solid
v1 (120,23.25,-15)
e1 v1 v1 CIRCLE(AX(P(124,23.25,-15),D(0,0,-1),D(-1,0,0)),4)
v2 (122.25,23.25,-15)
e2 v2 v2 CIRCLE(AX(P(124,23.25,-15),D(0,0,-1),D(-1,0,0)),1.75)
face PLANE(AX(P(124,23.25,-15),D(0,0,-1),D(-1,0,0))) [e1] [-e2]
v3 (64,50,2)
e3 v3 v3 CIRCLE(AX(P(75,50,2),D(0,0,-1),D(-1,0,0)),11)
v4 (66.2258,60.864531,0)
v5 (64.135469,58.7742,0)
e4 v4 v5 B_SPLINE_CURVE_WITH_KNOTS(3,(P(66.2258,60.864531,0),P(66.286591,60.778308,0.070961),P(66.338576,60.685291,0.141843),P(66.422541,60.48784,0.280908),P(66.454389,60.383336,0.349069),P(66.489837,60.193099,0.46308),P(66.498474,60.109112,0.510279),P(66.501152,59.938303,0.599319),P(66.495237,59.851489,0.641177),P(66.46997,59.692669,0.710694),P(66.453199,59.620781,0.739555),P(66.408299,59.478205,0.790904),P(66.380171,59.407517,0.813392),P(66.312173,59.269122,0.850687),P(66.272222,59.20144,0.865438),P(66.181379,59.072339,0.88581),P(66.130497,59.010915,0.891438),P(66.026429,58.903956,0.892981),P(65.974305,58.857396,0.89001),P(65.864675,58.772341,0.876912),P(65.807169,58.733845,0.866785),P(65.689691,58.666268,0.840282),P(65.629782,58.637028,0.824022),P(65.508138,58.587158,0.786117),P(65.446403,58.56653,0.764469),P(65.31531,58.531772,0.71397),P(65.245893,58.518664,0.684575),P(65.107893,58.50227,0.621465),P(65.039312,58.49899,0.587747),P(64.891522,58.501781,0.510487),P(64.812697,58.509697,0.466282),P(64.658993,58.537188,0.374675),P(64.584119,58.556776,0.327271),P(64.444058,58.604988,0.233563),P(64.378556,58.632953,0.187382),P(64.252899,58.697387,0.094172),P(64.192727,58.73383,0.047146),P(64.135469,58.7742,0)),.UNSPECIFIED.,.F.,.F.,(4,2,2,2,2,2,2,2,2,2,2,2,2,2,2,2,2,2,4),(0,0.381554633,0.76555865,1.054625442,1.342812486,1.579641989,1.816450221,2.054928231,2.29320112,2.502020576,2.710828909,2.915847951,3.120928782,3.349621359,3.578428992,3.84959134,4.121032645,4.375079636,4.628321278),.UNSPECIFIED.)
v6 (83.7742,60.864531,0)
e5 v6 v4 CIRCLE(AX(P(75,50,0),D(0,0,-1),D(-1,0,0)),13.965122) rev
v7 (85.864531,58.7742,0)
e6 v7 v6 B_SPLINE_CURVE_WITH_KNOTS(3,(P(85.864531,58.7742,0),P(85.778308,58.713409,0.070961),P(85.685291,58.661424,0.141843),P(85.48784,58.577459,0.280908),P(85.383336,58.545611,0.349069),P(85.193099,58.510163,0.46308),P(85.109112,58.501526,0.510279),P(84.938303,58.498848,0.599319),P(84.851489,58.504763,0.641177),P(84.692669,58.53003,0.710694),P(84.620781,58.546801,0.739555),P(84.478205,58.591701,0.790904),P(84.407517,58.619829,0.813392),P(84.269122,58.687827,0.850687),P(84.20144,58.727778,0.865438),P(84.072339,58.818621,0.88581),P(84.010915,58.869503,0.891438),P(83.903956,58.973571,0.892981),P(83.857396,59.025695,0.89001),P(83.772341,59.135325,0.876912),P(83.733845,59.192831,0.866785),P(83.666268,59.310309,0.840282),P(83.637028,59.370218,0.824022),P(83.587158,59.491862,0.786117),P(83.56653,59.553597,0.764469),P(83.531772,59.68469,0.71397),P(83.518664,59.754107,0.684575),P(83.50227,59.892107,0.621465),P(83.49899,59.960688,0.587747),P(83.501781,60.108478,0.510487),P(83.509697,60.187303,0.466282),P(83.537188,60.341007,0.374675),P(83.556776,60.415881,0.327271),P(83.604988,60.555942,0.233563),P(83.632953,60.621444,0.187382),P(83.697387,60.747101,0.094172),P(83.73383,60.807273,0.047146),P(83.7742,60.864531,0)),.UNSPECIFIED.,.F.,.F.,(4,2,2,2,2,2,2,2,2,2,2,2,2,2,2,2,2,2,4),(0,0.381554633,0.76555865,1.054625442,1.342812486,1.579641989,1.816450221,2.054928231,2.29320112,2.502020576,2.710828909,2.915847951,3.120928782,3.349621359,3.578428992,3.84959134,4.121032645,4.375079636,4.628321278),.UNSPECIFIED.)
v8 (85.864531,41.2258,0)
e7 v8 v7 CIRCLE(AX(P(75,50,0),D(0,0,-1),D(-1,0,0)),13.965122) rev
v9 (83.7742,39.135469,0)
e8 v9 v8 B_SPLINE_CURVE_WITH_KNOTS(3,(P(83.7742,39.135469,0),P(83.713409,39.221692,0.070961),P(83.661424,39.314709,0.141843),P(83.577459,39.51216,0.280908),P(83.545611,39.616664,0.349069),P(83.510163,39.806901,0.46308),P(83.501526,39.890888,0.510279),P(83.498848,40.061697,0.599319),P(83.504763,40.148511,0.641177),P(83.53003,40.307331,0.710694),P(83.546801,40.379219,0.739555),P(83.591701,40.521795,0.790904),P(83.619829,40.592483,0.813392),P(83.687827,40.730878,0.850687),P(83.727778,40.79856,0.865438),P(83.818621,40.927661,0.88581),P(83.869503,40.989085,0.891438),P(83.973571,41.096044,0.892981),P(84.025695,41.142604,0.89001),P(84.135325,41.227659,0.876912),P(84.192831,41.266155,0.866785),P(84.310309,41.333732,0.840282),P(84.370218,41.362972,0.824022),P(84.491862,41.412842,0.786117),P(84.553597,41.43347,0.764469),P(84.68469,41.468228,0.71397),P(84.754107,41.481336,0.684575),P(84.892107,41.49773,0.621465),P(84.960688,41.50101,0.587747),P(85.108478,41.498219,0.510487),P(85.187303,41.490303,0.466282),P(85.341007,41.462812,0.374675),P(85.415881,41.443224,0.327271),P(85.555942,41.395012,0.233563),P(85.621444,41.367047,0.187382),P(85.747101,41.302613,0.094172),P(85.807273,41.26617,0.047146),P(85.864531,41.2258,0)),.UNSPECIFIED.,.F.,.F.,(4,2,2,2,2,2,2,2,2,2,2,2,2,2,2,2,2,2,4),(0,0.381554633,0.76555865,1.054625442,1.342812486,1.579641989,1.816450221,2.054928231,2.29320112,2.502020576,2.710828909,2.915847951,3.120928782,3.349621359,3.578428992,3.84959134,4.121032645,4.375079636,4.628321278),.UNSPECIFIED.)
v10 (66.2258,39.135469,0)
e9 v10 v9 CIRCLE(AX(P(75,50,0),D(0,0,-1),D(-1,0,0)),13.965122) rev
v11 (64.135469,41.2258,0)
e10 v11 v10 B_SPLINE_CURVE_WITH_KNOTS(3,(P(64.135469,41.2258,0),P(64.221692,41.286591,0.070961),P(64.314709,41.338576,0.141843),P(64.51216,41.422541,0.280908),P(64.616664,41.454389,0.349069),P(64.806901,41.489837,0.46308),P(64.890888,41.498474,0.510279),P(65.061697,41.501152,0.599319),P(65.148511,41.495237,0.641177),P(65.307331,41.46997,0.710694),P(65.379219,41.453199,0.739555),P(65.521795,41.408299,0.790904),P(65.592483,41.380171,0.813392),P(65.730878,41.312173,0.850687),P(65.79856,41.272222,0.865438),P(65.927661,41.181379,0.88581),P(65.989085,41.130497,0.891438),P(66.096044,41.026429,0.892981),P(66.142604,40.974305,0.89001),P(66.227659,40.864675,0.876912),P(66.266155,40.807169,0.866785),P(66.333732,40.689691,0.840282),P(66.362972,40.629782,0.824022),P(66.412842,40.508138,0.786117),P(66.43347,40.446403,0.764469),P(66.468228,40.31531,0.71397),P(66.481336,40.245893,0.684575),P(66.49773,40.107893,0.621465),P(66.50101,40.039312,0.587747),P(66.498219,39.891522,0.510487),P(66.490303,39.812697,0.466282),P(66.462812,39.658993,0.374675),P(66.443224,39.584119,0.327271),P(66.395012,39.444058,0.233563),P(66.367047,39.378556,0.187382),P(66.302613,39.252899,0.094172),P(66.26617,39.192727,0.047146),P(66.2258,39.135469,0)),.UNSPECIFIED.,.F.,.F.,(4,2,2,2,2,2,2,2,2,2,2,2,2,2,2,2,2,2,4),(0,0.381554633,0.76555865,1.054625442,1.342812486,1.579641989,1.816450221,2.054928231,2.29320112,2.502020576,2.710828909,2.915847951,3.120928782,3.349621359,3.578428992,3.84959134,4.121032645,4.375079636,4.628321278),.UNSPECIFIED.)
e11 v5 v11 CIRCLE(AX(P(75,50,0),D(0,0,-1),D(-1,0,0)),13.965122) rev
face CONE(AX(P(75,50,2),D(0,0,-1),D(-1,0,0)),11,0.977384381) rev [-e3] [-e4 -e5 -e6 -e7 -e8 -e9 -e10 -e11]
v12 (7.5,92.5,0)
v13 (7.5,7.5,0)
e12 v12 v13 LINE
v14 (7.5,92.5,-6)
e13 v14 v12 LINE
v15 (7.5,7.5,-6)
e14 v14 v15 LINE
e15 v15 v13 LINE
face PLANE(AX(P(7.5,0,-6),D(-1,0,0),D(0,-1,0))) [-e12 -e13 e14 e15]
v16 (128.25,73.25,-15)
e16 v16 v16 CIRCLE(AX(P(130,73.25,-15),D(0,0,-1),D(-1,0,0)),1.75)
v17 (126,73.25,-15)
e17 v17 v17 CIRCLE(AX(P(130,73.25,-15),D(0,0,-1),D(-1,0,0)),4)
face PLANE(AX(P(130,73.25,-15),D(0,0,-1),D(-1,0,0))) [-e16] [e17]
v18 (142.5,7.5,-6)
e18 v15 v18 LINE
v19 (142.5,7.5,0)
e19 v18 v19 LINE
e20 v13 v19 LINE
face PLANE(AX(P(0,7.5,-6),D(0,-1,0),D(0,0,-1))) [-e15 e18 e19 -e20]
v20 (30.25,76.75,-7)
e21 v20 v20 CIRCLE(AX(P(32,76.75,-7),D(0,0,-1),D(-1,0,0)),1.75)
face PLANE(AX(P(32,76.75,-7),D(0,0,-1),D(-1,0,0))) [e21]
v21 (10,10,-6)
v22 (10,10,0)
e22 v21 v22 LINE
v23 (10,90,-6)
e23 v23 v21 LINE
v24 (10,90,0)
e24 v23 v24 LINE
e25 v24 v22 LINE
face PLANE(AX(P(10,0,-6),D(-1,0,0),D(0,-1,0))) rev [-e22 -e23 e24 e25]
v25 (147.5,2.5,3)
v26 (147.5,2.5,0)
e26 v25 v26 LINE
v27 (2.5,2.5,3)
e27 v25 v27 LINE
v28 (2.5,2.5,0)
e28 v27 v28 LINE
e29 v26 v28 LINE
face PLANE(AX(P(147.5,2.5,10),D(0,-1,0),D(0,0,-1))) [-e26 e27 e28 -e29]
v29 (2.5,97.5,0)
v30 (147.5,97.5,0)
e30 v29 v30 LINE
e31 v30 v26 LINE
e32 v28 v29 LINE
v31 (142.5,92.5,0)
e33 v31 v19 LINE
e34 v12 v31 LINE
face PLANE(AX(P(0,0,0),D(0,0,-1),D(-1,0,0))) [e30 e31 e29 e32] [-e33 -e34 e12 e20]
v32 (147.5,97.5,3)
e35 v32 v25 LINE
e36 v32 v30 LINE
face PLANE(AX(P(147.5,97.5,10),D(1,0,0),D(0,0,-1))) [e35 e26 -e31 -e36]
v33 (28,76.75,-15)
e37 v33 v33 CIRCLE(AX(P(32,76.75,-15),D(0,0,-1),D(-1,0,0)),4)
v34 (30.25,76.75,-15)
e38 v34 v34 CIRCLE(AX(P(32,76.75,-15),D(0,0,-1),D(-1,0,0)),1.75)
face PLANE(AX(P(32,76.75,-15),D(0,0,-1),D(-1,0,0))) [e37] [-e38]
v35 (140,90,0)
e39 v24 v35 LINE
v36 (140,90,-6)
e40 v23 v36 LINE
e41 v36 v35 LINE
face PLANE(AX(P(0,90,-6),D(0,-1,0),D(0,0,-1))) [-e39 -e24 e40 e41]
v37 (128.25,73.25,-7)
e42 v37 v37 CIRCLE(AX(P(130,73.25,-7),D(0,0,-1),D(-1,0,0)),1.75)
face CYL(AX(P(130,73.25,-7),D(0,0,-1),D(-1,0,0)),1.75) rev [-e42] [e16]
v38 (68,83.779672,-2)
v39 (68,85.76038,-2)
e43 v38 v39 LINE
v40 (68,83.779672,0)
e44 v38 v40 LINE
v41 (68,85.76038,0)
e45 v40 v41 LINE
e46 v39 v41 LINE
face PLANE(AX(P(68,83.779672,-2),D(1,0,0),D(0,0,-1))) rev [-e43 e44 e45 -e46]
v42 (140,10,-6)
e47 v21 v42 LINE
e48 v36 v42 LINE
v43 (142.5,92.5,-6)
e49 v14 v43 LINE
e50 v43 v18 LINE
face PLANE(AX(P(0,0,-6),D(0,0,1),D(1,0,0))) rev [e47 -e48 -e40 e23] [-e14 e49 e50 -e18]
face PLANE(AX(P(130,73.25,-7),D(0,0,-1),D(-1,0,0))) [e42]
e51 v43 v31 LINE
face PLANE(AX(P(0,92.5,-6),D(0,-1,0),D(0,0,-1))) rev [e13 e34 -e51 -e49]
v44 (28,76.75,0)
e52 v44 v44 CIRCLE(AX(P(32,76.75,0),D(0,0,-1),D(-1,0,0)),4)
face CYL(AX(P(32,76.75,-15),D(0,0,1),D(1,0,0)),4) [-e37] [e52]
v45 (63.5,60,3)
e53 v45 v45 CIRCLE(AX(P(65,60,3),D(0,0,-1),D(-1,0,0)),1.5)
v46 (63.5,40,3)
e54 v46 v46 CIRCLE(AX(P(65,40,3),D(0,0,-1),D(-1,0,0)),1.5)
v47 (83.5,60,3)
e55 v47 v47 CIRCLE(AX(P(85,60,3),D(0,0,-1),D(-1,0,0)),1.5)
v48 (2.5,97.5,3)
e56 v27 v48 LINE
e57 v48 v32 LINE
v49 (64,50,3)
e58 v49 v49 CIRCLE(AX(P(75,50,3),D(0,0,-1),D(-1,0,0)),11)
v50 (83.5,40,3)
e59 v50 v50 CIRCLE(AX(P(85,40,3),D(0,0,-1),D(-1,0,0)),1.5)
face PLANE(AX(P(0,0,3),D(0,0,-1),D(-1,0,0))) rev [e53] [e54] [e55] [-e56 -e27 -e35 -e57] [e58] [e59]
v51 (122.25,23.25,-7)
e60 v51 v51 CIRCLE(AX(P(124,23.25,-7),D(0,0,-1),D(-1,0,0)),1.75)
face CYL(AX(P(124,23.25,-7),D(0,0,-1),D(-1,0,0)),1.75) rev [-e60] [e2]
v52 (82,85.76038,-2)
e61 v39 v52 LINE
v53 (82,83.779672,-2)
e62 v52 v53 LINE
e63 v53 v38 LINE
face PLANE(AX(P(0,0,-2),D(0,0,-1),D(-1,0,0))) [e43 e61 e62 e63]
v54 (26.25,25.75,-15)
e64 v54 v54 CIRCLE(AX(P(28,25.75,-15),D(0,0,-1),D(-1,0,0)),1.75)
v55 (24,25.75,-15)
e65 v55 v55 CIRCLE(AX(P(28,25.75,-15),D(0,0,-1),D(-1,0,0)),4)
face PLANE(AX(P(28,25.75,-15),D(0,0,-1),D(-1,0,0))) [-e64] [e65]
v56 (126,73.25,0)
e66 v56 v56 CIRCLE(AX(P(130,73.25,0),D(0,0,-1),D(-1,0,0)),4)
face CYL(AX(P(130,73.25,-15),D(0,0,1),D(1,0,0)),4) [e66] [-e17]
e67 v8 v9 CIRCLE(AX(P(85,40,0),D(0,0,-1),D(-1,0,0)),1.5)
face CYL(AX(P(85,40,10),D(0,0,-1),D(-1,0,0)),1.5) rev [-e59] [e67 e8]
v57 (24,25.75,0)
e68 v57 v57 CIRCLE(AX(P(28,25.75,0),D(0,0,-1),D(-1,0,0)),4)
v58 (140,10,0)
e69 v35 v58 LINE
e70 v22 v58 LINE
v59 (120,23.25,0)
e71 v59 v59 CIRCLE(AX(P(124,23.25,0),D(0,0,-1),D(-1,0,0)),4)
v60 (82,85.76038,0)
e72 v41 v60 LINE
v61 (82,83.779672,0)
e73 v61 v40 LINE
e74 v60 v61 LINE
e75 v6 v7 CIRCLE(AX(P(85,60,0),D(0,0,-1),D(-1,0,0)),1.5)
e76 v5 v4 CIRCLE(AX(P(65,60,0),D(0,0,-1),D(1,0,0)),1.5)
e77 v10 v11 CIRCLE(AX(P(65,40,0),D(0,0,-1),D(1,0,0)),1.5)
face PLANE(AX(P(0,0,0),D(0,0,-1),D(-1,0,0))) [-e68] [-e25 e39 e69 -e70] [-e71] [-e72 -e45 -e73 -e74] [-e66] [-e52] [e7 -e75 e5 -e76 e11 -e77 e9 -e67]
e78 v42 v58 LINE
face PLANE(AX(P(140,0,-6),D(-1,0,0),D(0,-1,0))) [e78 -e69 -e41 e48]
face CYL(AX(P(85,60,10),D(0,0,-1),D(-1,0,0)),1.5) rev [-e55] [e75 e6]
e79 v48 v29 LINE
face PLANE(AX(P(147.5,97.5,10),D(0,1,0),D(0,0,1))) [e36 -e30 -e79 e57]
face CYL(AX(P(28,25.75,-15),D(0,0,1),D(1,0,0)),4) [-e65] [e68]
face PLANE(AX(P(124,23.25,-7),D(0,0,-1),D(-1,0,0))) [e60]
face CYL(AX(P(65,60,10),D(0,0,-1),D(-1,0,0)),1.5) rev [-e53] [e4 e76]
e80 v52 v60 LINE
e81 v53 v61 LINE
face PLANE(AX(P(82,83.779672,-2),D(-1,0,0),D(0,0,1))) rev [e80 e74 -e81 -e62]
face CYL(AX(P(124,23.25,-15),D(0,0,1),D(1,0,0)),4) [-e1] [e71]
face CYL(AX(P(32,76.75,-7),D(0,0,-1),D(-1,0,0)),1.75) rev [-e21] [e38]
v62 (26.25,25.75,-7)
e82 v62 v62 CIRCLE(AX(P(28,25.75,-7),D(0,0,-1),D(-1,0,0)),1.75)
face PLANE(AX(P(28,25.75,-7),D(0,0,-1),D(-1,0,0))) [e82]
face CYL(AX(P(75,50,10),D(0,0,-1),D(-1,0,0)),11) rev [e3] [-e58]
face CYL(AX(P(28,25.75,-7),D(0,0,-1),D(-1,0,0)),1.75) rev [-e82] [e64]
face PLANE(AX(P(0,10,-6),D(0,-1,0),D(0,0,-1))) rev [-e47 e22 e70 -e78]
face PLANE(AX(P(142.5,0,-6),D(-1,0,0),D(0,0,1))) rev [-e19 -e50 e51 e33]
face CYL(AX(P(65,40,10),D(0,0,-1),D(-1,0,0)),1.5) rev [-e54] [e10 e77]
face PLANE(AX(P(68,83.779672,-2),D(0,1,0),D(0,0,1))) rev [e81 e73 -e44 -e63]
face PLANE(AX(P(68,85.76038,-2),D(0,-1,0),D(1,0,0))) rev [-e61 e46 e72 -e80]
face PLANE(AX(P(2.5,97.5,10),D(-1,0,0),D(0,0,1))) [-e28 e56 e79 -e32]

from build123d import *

# Parameters (mm, degrees)
ESBO_O1_W                = 150
ESBO_O1_H                = 100
RESSALTO_EXTRUS_O1_DEPTH = 3
ESBO_O1_3_W              = 135
ESBO_O1_3_H              = 85
ESBO_O1_3_W_2            = 130
ESBO_O1_3_H_2            = 80
RESSALTO_EXTRUS_O2_DEPTH = 6
ESBO_O2_R                = 4
RESSALTO_EXTRUS_O3_DEPTH = 15
ESBO_O3_R                = 1.75
CORTE_EXTRUS_O1_DEPTH    = 8
ESBO_O4_W                = 14
ESBO_O4_H                = 1.980707968
RESSALTO_EXTRUS_O4_DEPTH = 2
ESBO_O5_R                = 11
ESBO_O5_R_2              = 1.5
CORTE_EXTRUS_O2_DEPTH    = 10
CHANFRO1_SIZE            = 2
CHANFRO1_SIZE_2          = 2.965121937
ESBO_O6_W                = 150
ESBO_O6_H                = 100
ESBO_O6_W_2              = 145
ESBO_O6_H_2              = 95
CORTE_EXTRUS_O3_DEPTH    = 10


with BuildPart() as part:
    # Esboço1 → Ressalto-extrusão1 (new body)
    with BuildSketch(Plane.XY):
        with Locations((75, 50)):
            Rectangle(ESBO_O1_W, ESBO_O1_H)
    extrude(amount=RESSALTO_EXTRUS_O1_DEPTH)

    # Esboço1<3> → Ressalto-extrusão2 (add)
    with BuildSketch(Plane.XY):
        with Locations((75, 50)):
            Rectangle(ESBO_O1_3_W, ESBO_O1_3_H)
        with Locations((75, 50)):
            Rectangle(ESBO_O1_3_W_2, ESBO_O1_3_H_2, mode=Mode.SUBTRACT)
    extrude(amount=-RESSALTO_EXTRUS_O2_DEPTH)

    # Esboço2 → Ressalto-extrusão3 (add)
    with BuildSketch(Plane(origin=(0, 0, 0), x_dir=(-1, 0, 0), z_dir=(0, 0, -1))):
        with Locations((-130, 73.25)):
            Circle(ESBO_O2_R)
        with Locations((-32, 76.75)):
            Circle(ESBO_O2_R)
        with Locations((-28, 25.75)):
            Circle(ESBO_O2_R)
        with Locations((-124, 23.25)):
            Circle(ESBO_O2_R)
    extrude(amount=RESSALTO_EXTRUS_O3_DEPTH)

    # Esboço3 → Corte-extrusão1 (cut)
    with BuildSketch(Plane(origin=(0, 0, -15), x_dir=(-1, 0, 0), z_dir=(0, 0, -1))):
        with Locations((-130, 73.25)):
            Circle(ESBO_O3_R)
        with Locations((-32, 76.75)):
            Circle(ESBO_O3_R)
        with Locations((-28, 25.75)):
            Circle(ESBO_O3_R)
        with Locations((-124, 23.25)):
            Circle(ESBO_O3_R)
    extrude(amount=-CORTE_EXTRUS_O1_DEPTH, mode=Mode.SUBTRACT)

    # Esboço4 → Ressalto-extrusão4 (add)
    with BuildSketch(Plane(origin=(0, 0, 0), x_dir=(-1, 0, 0), z_dir=(0, 0, -1))):
        with Locations((-75, 84.770026355)):
            Rectangle(ESBO_O4_W, ESBO_O4_H)
    extrude(amount=RESSALTO_EXTRUS_O4_DEPTH)

    # Esboço5 → Corte-extrusão2 (cut)
    with BuildSketch(Plane(origin=(0, 0, 0), x_dir=(-1, 0, 0), z_dir=(0, 0, -1))):
        with Locations((-75, 50)):
            Circle(ESBO_O5_R)
        with Locations((-85, 60)):
            Circle(ESBO_O5_R_2)
        with Locations((-65, 40)):
            Circle(ESBO_O5_R_2)
        with Locations((-85, 40)):
            Circle(ESBO_O5_R_2)
        with Locations((-65, 60)):
            Circle(ESBO_O5_R_2)
    extrude(amount=-CORTE_EXTRUS_O2_DEPTH, mode=Mode.SUBTRACT)

    # Chanfro1
    # the kernel refuses this chamfer: 2.965121937, 2 mm, written as the material it takes off along each edge
    with BuildSketch(Plane(origin=(75, 50, 0), x_dir=(-1, 0, 0), z_dir=(0, -1, 0))) as chanfro1_piece_1:
        Polygon((11, -CHANFRO1_SIZE), (11 + CHANFRO1_SIZE_2, 0), (11, 0), align=None)
    revolve(axis=Axis((75, 50, 0), (0, 0, -1)), mode=Mode.SUBTRACT)

    # Esboço6 → Corte-extrusão3 (cut)
    with BuildSketch(Plane(origin=(0, 0, 0), x_dir=(-1, 0, 0), z_dir=(0, 0, -1))):
        with Locations((-75, 50)):
            Rectangle(ESBO_O6_W, ESBO_O6_H)
        with Locations((-75, 50)):
            Rectangle(ESBO_O6_W_2, ESBO_O6_H_2, mode=Mode.SUBTRACT)
    extrude(amount=-CORTE_EXTRUS_O3_DEPTH, mode=Mode.SUBTRACT)


solid = part.part
